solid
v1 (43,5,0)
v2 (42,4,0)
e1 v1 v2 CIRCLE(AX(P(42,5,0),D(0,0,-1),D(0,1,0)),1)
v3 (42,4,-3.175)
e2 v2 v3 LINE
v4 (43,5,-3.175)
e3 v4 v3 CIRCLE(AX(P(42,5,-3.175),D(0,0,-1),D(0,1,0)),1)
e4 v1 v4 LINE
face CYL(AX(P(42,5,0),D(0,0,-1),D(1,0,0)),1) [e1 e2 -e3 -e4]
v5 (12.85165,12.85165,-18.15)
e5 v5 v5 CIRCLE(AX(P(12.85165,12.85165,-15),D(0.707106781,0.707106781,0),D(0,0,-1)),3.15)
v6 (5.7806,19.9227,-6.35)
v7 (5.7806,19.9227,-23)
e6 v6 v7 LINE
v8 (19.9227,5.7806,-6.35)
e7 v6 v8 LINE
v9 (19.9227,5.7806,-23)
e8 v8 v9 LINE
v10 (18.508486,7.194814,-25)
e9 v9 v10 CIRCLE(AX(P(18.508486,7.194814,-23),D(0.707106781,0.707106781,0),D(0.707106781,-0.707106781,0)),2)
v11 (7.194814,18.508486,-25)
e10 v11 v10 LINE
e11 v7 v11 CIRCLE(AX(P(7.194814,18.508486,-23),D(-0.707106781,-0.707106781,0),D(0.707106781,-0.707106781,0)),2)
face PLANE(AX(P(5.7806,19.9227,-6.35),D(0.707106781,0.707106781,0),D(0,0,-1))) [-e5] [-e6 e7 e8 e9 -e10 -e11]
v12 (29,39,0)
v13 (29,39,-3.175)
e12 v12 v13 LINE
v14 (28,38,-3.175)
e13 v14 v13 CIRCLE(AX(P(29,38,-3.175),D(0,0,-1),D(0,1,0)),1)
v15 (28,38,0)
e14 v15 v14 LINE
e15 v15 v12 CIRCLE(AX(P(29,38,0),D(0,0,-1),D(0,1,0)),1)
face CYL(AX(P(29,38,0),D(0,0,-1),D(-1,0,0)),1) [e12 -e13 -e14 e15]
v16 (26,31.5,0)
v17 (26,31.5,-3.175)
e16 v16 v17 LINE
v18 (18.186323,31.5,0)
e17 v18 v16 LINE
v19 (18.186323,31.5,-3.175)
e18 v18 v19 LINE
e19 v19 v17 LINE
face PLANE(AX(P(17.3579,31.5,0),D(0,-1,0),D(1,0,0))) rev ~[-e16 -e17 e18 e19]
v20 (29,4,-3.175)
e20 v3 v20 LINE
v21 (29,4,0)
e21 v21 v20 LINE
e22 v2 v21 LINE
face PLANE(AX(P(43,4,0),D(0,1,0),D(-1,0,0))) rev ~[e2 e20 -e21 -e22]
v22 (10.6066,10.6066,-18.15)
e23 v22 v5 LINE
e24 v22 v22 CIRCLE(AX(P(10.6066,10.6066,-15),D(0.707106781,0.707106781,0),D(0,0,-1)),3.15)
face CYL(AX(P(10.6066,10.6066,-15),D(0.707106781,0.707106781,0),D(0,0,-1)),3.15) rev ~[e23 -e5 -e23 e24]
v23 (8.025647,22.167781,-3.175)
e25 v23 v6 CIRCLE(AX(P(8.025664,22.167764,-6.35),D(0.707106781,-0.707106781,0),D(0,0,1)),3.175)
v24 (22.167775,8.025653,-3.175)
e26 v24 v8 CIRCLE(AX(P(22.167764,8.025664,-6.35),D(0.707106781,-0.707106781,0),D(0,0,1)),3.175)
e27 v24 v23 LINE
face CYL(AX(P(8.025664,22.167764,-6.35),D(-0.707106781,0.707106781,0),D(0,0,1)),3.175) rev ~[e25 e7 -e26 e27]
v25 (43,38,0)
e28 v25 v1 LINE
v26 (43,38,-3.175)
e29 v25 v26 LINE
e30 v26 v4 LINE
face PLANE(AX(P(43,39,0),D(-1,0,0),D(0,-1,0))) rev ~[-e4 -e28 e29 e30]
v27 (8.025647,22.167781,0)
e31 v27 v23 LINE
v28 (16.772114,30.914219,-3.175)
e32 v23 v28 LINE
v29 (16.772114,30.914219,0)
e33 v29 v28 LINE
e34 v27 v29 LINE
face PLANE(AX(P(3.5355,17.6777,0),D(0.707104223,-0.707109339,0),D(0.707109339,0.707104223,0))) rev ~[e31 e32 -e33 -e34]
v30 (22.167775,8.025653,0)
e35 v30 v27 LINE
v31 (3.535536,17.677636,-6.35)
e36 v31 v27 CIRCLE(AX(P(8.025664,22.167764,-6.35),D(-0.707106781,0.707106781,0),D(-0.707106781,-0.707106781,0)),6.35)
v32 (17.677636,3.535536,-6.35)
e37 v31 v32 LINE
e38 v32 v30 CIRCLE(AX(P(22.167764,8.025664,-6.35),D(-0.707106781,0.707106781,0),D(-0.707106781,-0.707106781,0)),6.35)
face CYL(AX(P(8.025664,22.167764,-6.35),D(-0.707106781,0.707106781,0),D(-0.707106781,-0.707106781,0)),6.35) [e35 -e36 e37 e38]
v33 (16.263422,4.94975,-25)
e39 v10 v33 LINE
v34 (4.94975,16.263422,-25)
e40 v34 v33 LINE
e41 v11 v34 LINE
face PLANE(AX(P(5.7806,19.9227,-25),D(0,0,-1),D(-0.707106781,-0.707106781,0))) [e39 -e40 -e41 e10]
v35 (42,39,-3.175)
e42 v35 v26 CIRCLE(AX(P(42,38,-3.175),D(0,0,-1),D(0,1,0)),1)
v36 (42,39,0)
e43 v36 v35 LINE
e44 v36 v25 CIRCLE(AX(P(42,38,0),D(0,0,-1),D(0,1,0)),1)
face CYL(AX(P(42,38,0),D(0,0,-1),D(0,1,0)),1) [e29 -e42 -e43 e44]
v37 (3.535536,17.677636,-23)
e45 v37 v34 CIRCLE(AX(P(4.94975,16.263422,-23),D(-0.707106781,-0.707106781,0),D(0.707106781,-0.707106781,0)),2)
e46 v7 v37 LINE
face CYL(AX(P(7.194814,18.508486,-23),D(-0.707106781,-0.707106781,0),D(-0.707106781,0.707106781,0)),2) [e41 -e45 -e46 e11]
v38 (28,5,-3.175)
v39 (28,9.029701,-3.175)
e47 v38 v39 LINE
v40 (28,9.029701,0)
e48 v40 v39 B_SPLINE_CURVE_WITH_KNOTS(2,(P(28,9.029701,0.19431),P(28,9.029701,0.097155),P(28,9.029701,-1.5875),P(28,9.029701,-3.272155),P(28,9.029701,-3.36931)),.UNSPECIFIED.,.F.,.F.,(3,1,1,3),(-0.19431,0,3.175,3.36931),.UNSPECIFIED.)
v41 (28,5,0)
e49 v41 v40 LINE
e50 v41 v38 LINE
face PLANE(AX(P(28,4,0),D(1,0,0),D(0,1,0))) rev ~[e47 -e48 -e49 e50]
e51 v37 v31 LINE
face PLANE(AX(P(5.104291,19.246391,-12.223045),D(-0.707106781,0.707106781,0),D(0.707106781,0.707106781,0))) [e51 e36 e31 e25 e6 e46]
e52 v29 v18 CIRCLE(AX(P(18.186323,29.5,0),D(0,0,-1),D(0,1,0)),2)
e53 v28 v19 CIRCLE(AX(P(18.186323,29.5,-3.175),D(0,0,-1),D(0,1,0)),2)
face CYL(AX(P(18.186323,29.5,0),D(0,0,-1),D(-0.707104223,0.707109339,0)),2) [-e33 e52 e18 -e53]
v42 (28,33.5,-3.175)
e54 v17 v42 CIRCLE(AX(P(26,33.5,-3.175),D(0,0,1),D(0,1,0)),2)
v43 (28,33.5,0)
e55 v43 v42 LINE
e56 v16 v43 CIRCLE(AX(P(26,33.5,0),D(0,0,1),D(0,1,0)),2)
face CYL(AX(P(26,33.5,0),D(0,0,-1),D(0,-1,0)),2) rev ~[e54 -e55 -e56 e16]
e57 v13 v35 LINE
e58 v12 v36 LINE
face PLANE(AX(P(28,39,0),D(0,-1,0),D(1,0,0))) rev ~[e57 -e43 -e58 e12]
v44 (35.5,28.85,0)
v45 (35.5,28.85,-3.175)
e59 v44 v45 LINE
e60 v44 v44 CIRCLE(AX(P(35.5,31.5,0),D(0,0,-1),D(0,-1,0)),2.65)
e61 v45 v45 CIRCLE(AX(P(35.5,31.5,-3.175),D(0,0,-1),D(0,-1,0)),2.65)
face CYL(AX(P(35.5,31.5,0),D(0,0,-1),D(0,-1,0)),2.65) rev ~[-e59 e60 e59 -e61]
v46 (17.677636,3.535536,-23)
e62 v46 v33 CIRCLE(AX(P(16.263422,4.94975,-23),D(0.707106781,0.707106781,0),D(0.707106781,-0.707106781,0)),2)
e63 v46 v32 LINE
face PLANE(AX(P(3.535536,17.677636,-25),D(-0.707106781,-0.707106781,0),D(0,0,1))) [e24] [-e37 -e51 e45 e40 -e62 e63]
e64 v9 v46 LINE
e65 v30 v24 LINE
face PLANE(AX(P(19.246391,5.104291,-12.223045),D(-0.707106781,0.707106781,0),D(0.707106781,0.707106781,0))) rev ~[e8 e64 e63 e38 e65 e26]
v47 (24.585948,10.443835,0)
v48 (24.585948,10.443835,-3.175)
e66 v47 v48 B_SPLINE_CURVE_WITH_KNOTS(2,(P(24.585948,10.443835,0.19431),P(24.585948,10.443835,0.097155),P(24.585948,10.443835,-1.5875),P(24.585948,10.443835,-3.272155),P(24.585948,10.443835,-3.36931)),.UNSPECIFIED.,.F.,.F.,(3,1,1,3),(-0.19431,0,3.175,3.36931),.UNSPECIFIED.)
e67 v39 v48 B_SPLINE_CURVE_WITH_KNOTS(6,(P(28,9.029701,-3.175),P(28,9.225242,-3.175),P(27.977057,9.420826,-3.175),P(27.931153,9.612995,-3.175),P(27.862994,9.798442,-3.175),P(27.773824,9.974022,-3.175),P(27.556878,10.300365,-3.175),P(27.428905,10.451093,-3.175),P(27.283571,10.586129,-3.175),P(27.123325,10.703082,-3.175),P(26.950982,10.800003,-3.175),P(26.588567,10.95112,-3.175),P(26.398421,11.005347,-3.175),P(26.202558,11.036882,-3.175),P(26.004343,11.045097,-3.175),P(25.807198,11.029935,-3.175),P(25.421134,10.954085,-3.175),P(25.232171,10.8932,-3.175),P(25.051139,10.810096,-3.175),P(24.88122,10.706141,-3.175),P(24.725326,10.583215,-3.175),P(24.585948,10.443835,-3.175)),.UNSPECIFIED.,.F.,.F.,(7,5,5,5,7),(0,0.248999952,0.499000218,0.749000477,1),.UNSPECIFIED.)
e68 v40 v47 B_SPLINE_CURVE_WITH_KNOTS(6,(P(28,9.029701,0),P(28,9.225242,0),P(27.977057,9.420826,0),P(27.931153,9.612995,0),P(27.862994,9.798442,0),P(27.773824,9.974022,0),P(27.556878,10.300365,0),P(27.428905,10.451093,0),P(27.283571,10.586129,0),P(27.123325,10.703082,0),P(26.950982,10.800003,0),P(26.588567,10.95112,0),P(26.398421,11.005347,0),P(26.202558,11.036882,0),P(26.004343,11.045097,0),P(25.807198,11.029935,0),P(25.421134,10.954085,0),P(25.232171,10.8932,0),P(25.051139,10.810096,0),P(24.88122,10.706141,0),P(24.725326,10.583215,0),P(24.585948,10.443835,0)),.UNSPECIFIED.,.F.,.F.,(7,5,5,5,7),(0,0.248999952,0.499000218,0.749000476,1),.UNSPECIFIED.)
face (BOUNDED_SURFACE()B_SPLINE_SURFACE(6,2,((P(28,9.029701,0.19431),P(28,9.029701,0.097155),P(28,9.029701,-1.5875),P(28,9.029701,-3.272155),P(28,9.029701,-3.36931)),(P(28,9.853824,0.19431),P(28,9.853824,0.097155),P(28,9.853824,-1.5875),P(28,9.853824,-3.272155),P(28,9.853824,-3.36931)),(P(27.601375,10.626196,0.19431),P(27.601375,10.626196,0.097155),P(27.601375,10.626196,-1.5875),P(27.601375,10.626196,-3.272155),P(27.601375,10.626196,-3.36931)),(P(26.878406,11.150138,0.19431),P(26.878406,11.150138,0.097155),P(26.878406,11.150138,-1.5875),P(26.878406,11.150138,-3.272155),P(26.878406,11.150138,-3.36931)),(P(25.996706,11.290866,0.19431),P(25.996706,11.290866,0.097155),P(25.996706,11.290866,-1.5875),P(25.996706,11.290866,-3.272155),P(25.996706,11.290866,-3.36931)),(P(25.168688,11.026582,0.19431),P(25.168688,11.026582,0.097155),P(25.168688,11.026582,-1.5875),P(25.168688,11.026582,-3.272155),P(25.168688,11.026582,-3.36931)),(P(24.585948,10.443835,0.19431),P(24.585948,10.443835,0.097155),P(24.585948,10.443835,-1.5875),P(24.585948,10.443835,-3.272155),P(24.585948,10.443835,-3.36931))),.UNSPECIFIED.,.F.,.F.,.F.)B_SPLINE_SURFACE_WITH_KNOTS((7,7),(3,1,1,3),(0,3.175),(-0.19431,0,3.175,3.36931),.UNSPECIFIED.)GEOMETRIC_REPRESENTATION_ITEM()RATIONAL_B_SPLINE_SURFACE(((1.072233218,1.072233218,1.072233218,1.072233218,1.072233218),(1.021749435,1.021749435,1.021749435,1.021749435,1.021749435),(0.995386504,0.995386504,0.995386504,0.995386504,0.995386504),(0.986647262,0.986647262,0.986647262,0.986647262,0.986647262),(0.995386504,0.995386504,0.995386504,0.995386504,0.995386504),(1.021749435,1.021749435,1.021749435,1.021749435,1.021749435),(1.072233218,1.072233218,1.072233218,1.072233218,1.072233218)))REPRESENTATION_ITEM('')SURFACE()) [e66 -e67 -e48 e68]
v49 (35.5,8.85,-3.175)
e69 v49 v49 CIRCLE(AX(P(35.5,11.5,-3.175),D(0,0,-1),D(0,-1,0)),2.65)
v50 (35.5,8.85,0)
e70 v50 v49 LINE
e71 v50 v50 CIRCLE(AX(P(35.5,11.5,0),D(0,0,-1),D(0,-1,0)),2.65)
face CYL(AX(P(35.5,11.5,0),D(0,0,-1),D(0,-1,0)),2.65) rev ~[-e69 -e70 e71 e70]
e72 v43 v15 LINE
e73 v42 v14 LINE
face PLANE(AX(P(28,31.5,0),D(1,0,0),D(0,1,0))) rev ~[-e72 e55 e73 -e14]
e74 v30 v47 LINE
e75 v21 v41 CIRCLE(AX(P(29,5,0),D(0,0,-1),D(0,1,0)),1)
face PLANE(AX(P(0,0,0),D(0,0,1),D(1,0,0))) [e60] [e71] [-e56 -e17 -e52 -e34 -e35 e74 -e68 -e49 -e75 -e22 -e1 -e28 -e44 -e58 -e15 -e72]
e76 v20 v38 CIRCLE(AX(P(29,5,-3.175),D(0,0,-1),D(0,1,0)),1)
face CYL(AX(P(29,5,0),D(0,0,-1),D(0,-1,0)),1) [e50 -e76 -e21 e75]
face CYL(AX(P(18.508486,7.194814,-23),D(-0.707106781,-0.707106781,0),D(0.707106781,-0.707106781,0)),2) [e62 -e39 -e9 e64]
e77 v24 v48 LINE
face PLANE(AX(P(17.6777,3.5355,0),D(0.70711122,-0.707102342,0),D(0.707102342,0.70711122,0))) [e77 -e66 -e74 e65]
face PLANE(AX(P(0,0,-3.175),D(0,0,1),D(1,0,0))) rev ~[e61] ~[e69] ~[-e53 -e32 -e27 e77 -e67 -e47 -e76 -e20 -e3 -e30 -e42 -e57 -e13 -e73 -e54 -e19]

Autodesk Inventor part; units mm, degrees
ref_plane "YZ Plane" through (0, 0, 0) normal (1, 0, 0) x (0, 1, 0)
ref_plane "XZ Plane" through (0, 0, 0) normal (0, 1, 0) x (-1, 0, 0)
ref_plane "XY Plane" through (0, 0, 0) normal (0, 0, 1) x (1, 0, 0)
sketch "Sketch1" plane through (0, 0, 0) normal (0, 0, 1) x (1, 0, 0)
  line L0 (0, -21.2132) -> (-21.2132, 0) construction
  line L1 (-21.2132, 0) -> (0, 21.2132) construction
  line L2 (0, 21.2132) -> (21.2132, 0) construction
  line L3 (21.2132, 0) -> (0, -21.2132) construction
  line L4 (0, -21.2132) -> (0, 21.2132) construction
  line L5 (-21.2132, 0) -> (21.2132, 0) construction
  line L6 (43, 4) -> (28, 4)
  line L7 (28, 4) -> (28, 39)
  line L8 (28, 39) -> (43, 39)
  line L9 (43, 39) -> (43, 4)
  line L10 (43, 4) -> (28, 39) construction
  line L11 (28, 4) -> (43, 39) construction
  line L12 (35.5, 11.5) -> (35.5, 31.5) construction
  line L13 (17.6777, 3.5355) -> (3.5355, 17.6777)
  line L14 (3.5355, 17.6777) -> (17.3579, 31.5)
  line L15 (17.3579, 31.5) -> (28, 31.5)
  line L16 (17.6777, 3.5355) -> (25.6421, 11.5)
  line L17 (25.6421, 11.5) -> (28, 11.5)
  line L18 (28, 11.5) -> (28, 31.5)
  point P0 (0, 0)
  point P1 (35.5, 21.5)
  point P2 (0, 0)
  point P3 (0, 0)
  point P4 (35.5, 21.5)
  point P5 (43, 21.5)
  point P6 (10.6066, 10.6066)
  point P7 (28, 21.5)
  dimension "d0" = 30
  dimension "d1" = 28
  dimension "d2" = 21.5
  dimension "d3" = 35
  dimension "d5" = 20
  dimension "d6" = 7.5
  dimension "d7" = 7.5
  dimension "d8" = 7.5
  dimension "d11" = 20
  dimension "d12" = 20
extrude "Plate2" add sketch "Sketch1" against normal blind 3.175
sketch "Sketch2" plane through (5.7806, 19.9227, 0) normal (-0.7071068, -0.7071068, 0) x (0.7071068, -0.7071068, 0)
  line L0 (20, 0) -> (0, 0)
  line L1 (0, 0) -> (0, -25)
  line L2 (0, -25) -> (20, -25)
  line L3 (20, -25) -> (20, 0)
edge flange "Flange1" height 25 angle 90 thickness 3.175 bend radius 3.175 thickness toward (-0.7071068, -0.7071068, 0) relief tear relief width 3.175 relief depth 1.5875 edges at (10.6066, 10.6066, -3.175) wall of the first edge with corners at (19.9227, 5.7806, 0) (5.7806, 19.9227, 0) (5.7806, 19.9227, -25) (19.9227, 5.7806, -25)
bend "Bend1"
corner "Corner1"
fillet "Fillet1" radius 2 4 edges at (25.6421, 11.5, -1.5875) (28, 11.5, -1.5875) (28, 31.5, -1.5875) (17.3579, 31.5, -1.5875)
sketch "Sketch3" plane through (3.5355, 17.6777, -6.35) normal (-0.7071068, -0.7071068, 0) x (-0.7071068, 0.7071068, 0)
  line L0 (0, -1.35) -> (-20, -1.35) construction
  line L1 (-20, -1.35) -> (-20, 18.65) construction
  line L2 (-20, 18.65) -> (0, 18.65) construction
  line L3 (0, 18.65) -> (0, -1.35) construction
  line L4 (0, -1.35) -> (-20, 18.65) construction
  line L5 (-20, -1.35) -> (0, 18.65) construction
  point P0 (-10, -6.35)
  point P1 (-10, 8.65)
hole "Hole2" at (10.6066, 10.6066, -15) direction (0.7071068, 0.7071068, 0) diameter 6.3 end through all
fillet "Fillet2" radius 2 2 edges at (4.6581, 18.8002, -25) (18.8002, 4.6581, -25)
fillet "Fillet3" radius 1 4 edges at (28, 4, -1.5875) (28, 39, -1.5875) (43, 4, -1.5875) (43, 39, -1.5875)
hole "Hole1" at (35.5, 31.5, 0) at (35.5, 11.5, 0) direction (0, 0, -1) diameter 5.3 end through all
equation "\"d6\" = d7"
equation "\"d8\" = d6"
equation "\"d12\" = d11"
equation "\"d32\" = Thickness"
equation "\"d13\" = Thickness"
equation "\"d14\" = BendReliefWidth"
equation "\"d15\" = BendReliefDepth"
equation "\"d16\" = MinimumRemnant"
equation "\"d17\" = TransitionRadius"
equation "\"d20\" = BendRadius"
equation "\"d21\" = CornerReliefSize"
equation "\"d22\" = GapSize"
equation "\"d23\" = JacobiRadiusSize"
equation "\"BendReliefWidth\" = Thickness"
equation "\"BendReliefDepth\" = 0.5 * Thickness"
equation "\"CornerReliefSize\" = 4 * Thickness"
equation "\"MinimumRemnant\" = 2 * Thickness"
equation "\"TransitionRadius\" = BendRadius"
equation "\"JacobiRadiusSize\" = BendRadius"
equation "\"GapSize\" = Thickness"
equation "\"Thickness\" = 3.175"
equation "\"BendRadius\" = 3.175"
properties part number "External Frame Corner Bracket" material "Aluminum 6061"
